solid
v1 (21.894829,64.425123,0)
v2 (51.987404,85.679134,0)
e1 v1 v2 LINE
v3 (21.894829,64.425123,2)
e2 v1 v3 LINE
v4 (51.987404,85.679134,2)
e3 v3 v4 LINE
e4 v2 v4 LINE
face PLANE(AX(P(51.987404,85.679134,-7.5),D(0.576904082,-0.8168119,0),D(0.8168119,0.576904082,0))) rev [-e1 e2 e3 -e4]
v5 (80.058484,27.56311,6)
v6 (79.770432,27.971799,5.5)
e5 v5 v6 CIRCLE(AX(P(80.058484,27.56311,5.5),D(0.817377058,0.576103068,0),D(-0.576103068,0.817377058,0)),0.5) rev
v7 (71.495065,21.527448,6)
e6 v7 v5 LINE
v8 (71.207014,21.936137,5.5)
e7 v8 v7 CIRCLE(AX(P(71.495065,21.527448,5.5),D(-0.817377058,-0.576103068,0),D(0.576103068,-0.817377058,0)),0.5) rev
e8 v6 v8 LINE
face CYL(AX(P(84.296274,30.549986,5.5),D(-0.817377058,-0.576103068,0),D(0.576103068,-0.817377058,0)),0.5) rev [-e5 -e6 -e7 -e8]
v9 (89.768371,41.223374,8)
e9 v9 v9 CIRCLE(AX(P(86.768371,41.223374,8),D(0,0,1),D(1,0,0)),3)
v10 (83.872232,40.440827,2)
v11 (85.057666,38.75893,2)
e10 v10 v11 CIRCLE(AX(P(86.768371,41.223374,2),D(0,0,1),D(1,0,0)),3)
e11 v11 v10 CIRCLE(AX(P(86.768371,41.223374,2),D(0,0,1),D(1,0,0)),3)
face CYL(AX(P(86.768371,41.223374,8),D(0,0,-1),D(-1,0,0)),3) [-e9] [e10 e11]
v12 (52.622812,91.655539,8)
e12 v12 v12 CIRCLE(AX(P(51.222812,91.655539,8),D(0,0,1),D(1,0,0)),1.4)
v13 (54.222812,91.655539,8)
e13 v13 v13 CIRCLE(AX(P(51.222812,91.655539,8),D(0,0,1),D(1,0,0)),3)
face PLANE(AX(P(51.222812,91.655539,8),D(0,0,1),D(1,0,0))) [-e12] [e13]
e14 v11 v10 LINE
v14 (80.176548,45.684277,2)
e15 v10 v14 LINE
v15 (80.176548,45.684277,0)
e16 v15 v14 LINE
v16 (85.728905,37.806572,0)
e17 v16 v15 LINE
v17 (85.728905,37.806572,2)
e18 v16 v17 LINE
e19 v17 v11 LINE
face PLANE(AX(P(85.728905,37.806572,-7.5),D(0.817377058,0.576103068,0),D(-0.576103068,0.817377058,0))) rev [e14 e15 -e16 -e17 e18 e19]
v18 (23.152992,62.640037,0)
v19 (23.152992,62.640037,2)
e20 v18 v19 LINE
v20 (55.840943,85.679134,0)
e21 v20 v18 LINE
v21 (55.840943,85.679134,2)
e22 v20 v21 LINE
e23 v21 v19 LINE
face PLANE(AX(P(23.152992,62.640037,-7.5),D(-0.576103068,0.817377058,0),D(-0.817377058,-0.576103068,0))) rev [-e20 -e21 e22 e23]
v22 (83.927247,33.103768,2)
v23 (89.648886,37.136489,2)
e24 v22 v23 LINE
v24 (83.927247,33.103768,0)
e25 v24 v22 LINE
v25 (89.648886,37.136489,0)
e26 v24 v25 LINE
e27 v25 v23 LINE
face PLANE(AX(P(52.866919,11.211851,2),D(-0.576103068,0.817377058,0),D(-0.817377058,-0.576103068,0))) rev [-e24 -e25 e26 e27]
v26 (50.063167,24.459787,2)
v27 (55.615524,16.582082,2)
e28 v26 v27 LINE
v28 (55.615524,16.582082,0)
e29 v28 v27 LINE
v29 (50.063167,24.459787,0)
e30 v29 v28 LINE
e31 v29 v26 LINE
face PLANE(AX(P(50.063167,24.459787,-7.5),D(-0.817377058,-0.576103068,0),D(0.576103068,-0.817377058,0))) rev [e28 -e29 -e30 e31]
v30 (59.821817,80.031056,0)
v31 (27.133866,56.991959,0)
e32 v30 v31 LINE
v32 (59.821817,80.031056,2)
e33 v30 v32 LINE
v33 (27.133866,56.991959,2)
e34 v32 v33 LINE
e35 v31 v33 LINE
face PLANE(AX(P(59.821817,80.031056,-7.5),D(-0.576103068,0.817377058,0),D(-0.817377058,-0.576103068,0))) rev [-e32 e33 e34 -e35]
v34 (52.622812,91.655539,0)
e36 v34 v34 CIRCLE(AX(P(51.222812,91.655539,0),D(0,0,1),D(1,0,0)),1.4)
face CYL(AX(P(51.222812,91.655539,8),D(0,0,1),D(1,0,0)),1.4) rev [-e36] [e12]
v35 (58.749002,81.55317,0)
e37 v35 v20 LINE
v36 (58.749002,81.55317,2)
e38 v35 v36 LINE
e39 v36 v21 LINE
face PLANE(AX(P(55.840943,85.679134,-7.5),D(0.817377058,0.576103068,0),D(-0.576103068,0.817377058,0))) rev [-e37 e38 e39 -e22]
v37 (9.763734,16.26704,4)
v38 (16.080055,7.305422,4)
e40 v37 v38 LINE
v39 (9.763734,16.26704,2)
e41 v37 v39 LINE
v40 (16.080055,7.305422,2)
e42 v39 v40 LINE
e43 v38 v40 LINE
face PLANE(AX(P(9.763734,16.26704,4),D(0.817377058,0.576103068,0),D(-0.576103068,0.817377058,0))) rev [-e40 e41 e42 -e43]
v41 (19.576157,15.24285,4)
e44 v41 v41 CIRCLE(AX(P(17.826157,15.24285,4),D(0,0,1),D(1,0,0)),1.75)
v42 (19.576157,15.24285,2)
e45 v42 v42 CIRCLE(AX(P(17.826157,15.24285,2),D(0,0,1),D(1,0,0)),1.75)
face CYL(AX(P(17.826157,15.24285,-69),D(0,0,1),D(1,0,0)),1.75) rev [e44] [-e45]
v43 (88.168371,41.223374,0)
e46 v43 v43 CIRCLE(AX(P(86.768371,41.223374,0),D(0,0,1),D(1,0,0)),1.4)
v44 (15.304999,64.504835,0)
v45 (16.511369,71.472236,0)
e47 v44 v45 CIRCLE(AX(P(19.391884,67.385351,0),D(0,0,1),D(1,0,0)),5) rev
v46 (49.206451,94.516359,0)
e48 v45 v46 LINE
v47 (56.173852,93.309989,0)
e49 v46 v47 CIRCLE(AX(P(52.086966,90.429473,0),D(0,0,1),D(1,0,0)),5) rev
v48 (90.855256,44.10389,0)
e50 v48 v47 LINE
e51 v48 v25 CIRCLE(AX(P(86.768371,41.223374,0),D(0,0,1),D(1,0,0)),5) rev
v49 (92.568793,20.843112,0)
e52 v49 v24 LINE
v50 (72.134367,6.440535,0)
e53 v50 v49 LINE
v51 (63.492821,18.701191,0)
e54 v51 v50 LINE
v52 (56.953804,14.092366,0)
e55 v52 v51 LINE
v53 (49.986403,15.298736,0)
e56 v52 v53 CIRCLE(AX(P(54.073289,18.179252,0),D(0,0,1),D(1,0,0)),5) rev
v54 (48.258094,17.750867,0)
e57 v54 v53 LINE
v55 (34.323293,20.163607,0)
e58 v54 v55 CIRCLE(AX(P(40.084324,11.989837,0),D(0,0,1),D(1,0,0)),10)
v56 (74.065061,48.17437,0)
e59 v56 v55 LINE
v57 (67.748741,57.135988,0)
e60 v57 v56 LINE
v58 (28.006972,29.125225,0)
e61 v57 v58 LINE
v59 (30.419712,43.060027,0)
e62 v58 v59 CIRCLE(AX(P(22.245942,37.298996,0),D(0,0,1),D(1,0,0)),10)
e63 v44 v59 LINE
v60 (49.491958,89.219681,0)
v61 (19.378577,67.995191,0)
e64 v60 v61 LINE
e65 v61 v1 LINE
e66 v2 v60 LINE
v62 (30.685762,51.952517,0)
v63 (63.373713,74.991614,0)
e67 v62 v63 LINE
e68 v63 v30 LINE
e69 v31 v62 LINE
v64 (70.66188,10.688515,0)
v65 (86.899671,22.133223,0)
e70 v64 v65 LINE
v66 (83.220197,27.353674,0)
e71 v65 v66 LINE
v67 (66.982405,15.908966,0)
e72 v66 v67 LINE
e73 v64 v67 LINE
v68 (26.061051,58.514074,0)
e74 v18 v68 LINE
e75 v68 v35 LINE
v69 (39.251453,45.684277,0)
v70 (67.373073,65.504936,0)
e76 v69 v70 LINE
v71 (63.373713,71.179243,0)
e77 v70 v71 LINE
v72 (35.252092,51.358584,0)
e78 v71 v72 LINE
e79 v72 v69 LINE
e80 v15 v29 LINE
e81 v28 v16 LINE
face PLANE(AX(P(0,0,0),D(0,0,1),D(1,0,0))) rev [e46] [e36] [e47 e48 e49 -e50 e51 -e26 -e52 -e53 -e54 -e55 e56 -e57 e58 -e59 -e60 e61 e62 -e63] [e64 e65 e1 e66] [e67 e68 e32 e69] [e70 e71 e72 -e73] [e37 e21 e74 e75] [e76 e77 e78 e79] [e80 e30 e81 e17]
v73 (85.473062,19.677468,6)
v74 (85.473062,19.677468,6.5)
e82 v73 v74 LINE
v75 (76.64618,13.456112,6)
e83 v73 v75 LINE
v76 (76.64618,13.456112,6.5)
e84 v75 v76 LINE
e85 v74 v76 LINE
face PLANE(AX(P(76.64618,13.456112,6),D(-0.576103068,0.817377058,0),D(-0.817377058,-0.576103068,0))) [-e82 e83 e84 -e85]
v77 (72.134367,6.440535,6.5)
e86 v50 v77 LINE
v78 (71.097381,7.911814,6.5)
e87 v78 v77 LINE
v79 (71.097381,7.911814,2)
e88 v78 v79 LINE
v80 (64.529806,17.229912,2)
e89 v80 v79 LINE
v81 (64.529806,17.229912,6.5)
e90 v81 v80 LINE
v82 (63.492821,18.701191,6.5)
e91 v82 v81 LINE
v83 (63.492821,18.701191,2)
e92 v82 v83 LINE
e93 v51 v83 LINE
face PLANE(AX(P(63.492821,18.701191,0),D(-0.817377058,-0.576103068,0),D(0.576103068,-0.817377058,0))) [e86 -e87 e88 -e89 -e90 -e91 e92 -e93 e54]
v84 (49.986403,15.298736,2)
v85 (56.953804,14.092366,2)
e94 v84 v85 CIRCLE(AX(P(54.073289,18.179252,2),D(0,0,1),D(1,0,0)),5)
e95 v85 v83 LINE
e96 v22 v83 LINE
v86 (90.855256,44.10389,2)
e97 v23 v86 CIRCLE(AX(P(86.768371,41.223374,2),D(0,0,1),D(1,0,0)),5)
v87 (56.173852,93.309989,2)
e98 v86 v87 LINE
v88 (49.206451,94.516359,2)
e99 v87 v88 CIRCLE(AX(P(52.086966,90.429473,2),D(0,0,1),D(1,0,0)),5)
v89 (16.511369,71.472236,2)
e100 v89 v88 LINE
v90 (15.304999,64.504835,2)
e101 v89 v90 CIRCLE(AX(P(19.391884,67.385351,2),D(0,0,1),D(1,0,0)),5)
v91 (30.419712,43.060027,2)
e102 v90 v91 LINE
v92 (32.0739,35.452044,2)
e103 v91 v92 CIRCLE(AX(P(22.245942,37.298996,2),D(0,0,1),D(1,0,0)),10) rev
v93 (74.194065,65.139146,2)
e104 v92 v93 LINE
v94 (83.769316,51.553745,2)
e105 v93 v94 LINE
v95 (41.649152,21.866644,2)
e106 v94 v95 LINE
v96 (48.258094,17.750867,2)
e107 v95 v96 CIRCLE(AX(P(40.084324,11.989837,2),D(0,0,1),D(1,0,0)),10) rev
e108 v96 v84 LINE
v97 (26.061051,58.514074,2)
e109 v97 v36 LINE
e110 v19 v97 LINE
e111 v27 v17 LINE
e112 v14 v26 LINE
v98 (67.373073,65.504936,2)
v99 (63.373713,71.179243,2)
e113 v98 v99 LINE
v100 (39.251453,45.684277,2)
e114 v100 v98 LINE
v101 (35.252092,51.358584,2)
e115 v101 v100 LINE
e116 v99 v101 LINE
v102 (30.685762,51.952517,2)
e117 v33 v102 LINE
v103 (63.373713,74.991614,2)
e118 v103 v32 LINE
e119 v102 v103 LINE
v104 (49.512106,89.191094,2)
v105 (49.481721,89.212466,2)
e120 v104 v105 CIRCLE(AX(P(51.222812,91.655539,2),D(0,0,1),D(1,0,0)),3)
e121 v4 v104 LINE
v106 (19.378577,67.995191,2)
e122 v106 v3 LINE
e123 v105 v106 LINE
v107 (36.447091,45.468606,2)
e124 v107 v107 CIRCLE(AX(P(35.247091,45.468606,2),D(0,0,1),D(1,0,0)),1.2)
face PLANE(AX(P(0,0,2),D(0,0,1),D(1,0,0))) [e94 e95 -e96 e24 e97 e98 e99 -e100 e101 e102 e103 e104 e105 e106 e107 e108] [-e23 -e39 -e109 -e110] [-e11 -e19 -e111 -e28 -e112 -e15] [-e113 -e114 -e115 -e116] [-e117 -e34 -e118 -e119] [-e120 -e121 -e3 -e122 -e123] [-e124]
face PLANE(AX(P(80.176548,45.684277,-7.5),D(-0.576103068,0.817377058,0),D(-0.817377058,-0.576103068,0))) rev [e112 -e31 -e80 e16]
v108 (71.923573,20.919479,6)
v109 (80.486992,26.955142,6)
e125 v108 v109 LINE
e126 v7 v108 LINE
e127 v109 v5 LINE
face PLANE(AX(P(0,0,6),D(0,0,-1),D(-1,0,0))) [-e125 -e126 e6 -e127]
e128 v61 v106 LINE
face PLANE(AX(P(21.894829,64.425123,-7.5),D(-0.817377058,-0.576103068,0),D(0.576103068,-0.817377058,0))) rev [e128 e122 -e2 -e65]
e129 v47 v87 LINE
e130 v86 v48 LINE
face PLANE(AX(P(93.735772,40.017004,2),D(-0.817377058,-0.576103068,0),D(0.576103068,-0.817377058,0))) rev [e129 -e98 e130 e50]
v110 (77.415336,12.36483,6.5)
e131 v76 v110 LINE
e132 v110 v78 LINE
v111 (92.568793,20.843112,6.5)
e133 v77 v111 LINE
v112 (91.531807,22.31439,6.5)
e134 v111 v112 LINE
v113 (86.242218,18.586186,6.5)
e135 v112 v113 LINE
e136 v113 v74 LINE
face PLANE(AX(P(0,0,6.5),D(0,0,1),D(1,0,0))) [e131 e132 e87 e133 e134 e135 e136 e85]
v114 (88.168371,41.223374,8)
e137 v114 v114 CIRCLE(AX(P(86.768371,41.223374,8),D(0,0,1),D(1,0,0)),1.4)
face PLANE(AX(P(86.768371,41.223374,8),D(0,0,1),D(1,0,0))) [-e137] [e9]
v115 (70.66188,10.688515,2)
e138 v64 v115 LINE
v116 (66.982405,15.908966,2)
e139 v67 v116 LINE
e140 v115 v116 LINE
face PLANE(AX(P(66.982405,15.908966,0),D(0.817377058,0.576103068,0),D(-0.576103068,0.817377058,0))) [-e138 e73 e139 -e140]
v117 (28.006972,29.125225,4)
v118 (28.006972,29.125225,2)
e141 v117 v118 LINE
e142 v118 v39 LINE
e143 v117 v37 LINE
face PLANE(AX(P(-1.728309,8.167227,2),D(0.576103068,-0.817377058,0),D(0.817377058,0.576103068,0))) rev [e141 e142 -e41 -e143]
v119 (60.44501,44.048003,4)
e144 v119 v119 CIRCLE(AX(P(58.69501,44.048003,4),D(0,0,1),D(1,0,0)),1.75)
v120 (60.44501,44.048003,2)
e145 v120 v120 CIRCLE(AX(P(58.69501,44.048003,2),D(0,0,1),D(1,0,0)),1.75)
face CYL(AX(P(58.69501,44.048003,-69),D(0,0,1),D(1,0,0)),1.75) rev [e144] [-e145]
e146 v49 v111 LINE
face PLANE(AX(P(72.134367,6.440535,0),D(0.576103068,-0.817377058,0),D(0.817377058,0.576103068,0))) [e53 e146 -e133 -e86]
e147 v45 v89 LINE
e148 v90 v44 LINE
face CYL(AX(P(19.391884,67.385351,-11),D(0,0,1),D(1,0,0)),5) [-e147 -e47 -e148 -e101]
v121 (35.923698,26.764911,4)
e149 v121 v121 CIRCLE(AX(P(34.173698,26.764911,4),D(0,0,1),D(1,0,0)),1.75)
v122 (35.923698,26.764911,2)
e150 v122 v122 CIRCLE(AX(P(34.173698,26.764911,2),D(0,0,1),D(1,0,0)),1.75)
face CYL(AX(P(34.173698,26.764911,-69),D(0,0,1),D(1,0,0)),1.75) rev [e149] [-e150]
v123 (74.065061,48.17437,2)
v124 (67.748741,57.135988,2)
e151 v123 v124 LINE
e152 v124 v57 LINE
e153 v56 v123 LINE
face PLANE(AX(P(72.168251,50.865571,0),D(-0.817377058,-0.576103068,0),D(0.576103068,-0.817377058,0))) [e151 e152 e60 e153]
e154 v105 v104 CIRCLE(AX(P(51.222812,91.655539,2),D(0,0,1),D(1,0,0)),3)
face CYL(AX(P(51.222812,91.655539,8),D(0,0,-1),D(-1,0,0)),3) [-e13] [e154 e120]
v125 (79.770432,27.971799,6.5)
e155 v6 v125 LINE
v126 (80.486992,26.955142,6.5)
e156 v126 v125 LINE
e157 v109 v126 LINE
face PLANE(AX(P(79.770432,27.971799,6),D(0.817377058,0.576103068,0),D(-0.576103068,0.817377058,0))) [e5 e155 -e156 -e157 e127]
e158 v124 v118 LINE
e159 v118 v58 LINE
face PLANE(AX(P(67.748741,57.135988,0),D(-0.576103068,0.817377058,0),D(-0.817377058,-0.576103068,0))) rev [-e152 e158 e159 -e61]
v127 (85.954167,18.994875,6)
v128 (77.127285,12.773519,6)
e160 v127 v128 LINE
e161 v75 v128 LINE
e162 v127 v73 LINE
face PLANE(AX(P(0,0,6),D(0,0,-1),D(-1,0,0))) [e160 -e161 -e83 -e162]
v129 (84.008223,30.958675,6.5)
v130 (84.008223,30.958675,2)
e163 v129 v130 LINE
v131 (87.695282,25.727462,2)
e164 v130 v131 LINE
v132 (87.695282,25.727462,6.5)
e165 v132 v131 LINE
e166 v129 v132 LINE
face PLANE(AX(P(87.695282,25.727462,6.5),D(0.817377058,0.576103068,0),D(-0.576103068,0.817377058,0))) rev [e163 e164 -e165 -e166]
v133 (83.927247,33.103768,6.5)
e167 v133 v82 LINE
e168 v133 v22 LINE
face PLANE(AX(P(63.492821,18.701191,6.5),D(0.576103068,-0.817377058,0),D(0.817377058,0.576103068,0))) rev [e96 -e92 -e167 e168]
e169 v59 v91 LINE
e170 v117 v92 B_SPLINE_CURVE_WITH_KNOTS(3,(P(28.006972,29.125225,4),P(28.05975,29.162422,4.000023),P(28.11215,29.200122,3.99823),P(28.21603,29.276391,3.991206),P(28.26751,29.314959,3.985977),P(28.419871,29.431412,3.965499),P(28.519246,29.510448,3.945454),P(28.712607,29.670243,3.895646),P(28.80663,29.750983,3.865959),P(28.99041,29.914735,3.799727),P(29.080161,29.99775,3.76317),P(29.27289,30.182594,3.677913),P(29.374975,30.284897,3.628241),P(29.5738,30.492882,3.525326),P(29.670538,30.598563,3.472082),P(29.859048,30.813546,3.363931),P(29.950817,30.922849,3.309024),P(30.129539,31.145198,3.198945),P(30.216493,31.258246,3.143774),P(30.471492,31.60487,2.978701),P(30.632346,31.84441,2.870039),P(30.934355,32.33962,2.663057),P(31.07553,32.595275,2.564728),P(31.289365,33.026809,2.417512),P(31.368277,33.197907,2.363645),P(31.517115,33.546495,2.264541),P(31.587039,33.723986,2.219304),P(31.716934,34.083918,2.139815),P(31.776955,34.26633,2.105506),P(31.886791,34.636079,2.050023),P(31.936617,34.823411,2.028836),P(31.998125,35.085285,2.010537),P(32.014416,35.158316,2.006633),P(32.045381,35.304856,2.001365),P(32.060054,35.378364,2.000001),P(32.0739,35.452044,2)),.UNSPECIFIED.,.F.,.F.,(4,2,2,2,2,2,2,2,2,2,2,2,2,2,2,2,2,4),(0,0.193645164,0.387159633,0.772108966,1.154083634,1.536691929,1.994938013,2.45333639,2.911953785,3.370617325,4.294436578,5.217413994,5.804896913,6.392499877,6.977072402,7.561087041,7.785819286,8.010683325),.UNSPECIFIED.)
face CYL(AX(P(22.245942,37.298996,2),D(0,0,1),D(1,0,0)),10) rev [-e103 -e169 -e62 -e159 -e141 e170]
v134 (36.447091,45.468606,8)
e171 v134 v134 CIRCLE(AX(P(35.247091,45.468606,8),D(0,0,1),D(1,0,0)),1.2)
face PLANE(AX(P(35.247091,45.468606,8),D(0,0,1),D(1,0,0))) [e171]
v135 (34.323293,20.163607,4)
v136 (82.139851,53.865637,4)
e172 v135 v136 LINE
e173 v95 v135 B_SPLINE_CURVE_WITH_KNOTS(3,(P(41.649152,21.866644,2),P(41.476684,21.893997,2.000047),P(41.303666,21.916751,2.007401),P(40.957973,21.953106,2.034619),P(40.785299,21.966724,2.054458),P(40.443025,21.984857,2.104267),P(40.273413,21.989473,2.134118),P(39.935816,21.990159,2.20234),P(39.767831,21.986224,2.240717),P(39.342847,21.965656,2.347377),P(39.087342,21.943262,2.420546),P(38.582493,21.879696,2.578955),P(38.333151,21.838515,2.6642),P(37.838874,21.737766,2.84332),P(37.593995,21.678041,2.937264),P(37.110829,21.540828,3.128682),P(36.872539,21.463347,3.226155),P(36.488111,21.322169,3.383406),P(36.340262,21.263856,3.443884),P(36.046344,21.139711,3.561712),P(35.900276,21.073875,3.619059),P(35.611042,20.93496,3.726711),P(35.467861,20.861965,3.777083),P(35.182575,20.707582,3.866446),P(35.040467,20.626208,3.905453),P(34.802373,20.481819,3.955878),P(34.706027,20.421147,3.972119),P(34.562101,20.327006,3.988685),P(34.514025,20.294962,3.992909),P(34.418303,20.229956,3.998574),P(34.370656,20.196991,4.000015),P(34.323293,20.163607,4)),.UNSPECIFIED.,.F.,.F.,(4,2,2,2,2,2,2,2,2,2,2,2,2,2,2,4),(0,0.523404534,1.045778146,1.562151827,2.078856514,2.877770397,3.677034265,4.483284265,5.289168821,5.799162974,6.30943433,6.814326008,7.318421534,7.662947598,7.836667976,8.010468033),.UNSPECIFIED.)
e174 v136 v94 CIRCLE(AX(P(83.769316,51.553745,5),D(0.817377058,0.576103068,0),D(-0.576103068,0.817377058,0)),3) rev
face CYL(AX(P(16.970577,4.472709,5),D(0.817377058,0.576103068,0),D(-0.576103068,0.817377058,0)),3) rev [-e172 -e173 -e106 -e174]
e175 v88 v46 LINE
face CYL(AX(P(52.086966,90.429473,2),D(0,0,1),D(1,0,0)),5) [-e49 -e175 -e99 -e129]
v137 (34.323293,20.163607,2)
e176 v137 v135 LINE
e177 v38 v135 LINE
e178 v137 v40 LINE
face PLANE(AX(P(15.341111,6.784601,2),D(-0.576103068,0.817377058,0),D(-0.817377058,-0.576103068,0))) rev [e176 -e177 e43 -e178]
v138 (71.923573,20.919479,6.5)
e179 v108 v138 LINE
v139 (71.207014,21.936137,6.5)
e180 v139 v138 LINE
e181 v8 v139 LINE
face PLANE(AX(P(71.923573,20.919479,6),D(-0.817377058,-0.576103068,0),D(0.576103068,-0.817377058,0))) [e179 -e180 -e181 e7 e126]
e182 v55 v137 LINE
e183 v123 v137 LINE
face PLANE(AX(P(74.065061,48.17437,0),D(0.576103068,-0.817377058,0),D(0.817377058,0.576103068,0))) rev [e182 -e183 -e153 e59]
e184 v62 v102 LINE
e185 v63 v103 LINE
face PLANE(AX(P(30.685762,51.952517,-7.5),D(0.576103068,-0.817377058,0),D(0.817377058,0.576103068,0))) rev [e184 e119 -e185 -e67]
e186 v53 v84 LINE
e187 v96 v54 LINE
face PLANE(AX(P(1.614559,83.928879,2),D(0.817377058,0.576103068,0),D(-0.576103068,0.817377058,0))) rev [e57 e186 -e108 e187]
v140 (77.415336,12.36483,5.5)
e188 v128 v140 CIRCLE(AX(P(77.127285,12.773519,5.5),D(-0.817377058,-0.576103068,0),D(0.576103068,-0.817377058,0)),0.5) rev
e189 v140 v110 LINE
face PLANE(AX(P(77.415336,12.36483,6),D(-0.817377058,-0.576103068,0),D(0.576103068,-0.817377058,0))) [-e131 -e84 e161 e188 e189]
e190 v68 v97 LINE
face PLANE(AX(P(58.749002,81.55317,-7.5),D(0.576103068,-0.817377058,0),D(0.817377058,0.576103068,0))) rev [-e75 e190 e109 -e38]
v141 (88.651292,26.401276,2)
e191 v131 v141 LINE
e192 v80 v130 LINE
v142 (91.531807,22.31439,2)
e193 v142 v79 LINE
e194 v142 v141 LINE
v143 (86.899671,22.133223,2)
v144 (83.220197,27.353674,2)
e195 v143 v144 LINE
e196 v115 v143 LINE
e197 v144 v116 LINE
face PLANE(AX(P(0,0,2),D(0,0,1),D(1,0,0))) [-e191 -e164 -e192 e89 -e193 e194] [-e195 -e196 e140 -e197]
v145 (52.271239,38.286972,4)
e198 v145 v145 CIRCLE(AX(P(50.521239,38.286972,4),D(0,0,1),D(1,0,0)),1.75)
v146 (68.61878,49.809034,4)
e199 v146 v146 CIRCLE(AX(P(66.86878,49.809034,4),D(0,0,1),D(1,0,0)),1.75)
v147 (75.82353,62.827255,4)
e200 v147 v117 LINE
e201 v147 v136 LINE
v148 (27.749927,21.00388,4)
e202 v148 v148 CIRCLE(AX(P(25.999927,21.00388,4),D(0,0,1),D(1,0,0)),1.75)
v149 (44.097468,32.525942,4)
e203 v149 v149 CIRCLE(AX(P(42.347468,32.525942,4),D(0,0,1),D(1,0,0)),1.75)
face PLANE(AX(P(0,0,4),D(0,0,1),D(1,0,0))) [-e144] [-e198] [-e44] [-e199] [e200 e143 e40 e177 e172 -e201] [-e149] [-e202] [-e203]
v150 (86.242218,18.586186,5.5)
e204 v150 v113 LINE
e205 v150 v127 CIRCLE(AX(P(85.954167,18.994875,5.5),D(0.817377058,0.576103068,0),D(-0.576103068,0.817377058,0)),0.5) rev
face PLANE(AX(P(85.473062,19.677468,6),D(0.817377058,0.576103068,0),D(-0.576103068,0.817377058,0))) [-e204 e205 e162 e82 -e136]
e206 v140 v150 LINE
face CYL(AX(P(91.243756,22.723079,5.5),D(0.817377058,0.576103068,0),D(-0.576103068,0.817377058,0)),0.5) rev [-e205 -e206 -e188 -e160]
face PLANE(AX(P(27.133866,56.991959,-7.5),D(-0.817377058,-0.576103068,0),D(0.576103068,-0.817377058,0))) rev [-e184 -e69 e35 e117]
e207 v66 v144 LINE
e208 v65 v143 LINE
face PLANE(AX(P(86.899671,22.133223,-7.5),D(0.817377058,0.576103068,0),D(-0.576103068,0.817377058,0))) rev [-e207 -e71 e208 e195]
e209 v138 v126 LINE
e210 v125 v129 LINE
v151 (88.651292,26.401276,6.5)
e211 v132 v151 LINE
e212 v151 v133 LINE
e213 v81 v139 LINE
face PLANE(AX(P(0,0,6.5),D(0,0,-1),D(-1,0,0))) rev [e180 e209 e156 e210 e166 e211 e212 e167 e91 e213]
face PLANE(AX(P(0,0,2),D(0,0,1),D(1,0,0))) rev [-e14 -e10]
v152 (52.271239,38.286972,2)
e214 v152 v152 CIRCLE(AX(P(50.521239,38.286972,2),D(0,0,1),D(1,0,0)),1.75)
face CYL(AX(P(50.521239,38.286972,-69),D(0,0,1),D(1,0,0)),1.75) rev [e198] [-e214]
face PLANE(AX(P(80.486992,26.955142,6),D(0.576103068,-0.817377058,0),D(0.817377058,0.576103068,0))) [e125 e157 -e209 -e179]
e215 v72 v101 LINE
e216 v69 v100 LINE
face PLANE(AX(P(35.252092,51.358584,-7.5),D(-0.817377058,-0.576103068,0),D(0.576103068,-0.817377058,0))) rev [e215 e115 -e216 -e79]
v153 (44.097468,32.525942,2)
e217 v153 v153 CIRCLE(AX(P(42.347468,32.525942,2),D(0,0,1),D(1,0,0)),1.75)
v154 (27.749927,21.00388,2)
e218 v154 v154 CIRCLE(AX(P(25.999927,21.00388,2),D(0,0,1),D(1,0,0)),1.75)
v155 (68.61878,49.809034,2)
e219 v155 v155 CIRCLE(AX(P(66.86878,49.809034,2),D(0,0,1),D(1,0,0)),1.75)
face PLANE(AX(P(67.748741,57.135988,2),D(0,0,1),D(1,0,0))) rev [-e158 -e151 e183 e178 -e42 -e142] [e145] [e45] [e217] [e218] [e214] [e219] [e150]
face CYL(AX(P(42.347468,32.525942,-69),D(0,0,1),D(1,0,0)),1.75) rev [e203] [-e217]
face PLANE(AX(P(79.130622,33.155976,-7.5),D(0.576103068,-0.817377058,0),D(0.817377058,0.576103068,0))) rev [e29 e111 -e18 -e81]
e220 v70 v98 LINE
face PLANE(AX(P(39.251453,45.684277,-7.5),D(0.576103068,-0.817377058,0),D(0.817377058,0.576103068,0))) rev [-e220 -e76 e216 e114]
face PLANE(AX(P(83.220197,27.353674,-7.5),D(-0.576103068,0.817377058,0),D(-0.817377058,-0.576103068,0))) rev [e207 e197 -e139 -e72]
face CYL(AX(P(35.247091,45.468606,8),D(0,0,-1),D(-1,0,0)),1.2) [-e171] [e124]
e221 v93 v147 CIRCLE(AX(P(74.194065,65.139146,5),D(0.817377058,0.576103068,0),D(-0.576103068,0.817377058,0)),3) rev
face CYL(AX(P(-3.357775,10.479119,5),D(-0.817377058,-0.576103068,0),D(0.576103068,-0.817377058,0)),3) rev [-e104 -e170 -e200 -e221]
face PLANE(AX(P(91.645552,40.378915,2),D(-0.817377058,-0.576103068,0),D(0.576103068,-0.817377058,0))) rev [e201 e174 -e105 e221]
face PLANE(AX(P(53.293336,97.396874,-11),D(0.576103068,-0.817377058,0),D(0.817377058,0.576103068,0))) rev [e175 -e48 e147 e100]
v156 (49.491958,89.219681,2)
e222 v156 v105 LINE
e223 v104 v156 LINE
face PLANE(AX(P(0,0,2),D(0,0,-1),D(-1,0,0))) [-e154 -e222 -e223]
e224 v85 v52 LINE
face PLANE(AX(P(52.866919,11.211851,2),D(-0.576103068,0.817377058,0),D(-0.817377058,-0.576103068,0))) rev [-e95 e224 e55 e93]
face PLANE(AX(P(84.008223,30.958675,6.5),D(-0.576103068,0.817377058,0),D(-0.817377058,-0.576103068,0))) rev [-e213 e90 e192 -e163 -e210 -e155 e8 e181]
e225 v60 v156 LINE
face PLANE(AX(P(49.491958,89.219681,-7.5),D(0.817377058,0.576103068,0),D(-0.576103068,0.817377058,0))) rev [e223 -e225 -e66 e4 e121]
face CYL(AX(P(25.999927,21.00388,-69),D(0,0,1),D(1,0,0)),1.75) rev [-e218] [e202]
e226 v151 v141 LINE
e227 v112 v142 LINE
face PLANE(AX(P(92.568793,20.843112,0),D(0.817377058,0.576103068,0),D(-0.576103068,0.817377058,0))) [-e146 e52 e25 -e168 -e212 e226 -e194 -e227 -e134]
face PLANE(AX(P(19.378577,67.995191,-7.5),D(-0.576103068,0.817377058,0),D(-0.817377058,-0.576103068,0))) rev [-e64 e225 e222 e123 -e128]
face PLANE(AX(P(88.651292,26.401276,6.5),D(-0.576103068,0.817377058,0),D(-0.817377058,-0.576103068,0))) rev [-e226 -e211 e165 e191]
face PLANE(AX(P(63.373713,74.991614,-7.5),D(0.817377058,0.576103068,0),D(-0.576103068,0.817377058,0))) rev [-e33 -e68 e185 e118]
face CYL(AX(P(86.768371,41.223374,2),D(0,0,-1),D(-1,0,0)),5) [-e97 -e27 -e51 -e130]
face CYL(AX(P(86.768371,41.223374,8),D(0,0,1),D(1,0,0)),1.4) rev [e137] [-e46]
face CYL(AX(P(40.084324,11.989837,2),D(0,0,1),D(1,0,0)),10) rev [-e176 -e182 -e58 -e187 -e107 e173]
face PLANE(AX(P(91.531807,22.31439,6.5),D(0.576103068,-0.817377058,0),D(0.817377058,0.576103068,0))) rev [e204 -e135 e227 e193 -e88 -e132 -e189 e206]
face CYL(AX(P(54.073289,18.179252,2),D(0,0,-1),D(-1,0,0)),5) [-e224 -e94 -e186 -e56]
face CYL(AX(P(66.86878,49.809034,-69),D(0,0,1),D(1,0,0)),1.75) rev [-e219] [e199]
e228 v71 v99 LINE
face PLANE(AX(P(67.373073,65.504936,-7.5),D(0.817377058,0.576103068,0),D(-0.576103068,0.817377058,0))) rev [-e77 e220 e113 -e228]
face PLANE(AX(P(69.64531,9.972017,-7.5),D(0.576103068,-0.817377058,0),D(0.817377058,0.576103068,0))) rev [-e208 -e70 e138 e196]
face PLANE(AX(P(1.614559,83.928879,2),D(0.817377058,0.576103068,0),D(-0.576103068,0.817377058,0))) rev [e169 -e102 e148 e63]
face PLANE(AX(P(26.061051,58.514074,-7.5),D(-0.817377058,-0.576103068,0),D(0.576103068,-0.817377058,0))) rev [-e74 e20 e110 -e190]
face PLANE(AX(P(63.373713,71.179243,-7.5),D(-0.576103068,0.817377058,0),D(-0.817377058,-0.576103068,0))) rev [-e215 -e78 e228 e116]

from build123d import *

# Parameters (mm, degrees)
SKETCH_1_R                = 2.1
EXTRUDE_1_DEPTH           = 2
EXTRUDE_2_DEPTH           = 40
EXTRUDE_3_DEPTH           = 2
FILLET_1_R                = 10
EXTRUDE_START             = -4
SKETCH_10_R               = 2.075
EXTRUDE_4_DEPTH           = 4
SKETCH_14_R               = 3.5715559825460215
CUT_EXTRUDE_6_DEPTH       = 4
EXTRUDE_5_DEPTH           = 2
FILLET_START              = 47.050234375
FILLET_4_DEPTH            = 51.949765625
FILLET_START_2            = 39.671388204
FILLET_4_2_DEPTH          = 59.328611796
FILLET_START_3            = 2
FILLET_4_3_DEPTH          = 3
EXTRUDE_START_2           = 2
SKETCH_19_R               = 2.075
EXTRUDE_6_DEPTH           = 2
CUT_EXTRUDE_START         = -2
SKETCH_22_R               = 3.5715559825460206
CUT_EXTRUDE_11_DEPTH      = 2
SKETCH_23_R               = 3.75
CUT_EXTRUDE_12_DEPTH      = 2
CUT_EXTRUDE_13_DEPTH      = 28.999999999999996
CUT_EXTRUDE_14_DEPTH      = 12.999999999999984
SKETCH_29_R               = 3.0000000000000084
SKETCH_29_R_2             = 3.0000000000000018
SKETCH_29_R_3             = 1.2000000000000004
EXTRUDE_8_DEPTH           = 5.999999999999993
CUT_EXTRUDE_15_DEPTH      = 13
M3X0_5_1_D                = 2.8
FILLET_START_4            = -1
FILLET_8_DEPTH            = 4
EXTRUDE_9_DEPTH           = 1.9999999999999991
EXTRUDE_10_DEPTH          = 4.5
EXTRUDE_11_DEPTH          = 0.5
FILLET_9_R                = 0.5
CUT_EXTRUDE_16_DEPTH      = 9.500000000000002
EXTRUDE_12_DEPTH          = 2
CUT_EXTRUDE_19_DEPTH      = 10
CUT_EXTRUDE_19_DEPTH_BACK = 11.999999999999996
SKETCH_44_W               = 6
SKETCH_44_H               = 13.386484239674381
SKETCH_47_W               = 2
SKETCH_47_H               = 10.963872604458905
CUT_EXTRUDE_20_DEPTH      = 73.00000000000006
SKETCH_48_R               = 1.7500000000000004
SKETCH_48_R_2             = 1.7500000000000038
SKETCH_48_R_3             = 1.7499999999999882
SKETCH_48_R_4             = 1.749999999999997
CUT_EXTRUDE_21_DEPTH      = 73.00000000000006


with BuildPart() as part:
    # 草图1 → 凸台-拉伸1 (new body)
    with BuildSketch(Plane.XY):
        with BuildLine():
            Line((5.715095935783956, 0), (15.341111112939824, 6.784600591097247))
            Line((15.341111112939824, 6.784600591097247), (42.49706355926069, 25.92463804463833))
            Line((42.49706355926069, 25.92463804463833), (52.86691877711603, 11.211850995247643))
            Line((52.86691877711603, 11.211850995247643), (93.73577169209018, 40.017004378179195))
            Line((93.73577169209018, 40.017004378179195), (42.483411773869754, 112.7340328625418))
            Line((42.483411773869754, 112.7340328625418), (1.6145588588956372, 83.92887947961026))
            Line((1.6145588588956372, 83.92887947961026), (36.18074291841349, 34.88625598164134))
            Line((36.18074291841349, 34.88625598164134), (-1.7283092029758853, 8.167227110682408))
            Line((-1.7283092029758853, 8.167227110682408), (0, 5.715095935783956))
            ThreePointArc((0, 5.715095935783956), (-4.0411830913245135, -4.041183091324513), (5.715095935783956, 0))
        make_face()
        Circle(SKETCH_1_R, mode=Mode.SUBTRACT)
        with BuildLine():
            Line((7.071067811864017, 9.899494936610912), (6.585786437625429, 9.414213562372302))
            ThreePointArc((6.585786437625429, 9.414213562372302), (6.585786437625458, 6.585786437626118), (9.41421356237164, 6.58578643762615))
            Line((9.41421356237164, 6.58578643762615), (9.899494936610207, 7.071067811864724))
            ThreePointArc((9.899494936610207, 7.071067811864724), (9.899494936610207, 9.899494936610912), (7.071067811864017, 9.899494936610912))
        make_face(mode=Mode.SUBTRACT)
    extrude(amount=EXTRUDE_1_DEPTH)

    # 草图2 → 凸台-拉伸2 (add)
    with BuildSketch(Plane.XY.offset(2)):
        Polygon((2.4787134603835828, 82.70281389216105), (42.12150078790845, 110.64381267360466), (91.64555150315304, 40.37891536414052), (52.00276417562808, 12.43791658269687), (52.86691877711603, 11.211850995247648), (93.73577169209018, 40.017004378179195), (42.483411773869754, 112.7340328625418), (1.6145588588956372, 83.92887947961026), align=None)
    extrude(amount=EXTRUDE_2_DEPTH)

    # 草图4 → 凸台-拉伸3 (add)
    with BuildSketch(Plane.XY.offset(42)):
        Polygon((93.73577169209018, 40.017004378179195), (52.86691877711603, 11.211850995247648), (1.6145588588956372, 83.92887947961026), (42.483411773869754, 112.7340328625418), align=None)
    extrude(amount=EXTRUDE_3_DEPTH)

    # 圆角1
    fillet_1_edges = [part.edges().sort_by_distance(p)[0] for p in [
        (36.18074291841349, 34.88625598164134, 1),
        (42.49706355926069, 25.92463804463833, 1),
    ]]
    fillet(fillet_1_edges, radius=FILLET_1_R)

    # 草图10 → 凸台-拉伸4 (add)
    with BuildSketch(Plane.XY.offset(2).offset(EXTRUDE_START)):
        with BuildLine():
            Line((8.031882820422537, 15.046398123036559), (14.348203461269724, 6.084780186033628))
            Line((14.348203461269724, 6.084780186033628), (5.715095935783956, 0))
            ThreePointArc((5.715095935783956, 0), (-4.0411830913245135, -4.041183091324513), (0, 5.715095935783956))
            Line((0, 5.715095935783956), (-1.7283092029758853, 8.167227110682408))
            Line((-1.7283092029758853, 8.167227110682408), (8.031882820422537, 15.046398123036559))
        make_face()
        Circle(SKETCH_10_R, mode=Mode.SUBTRACT)
        with BuildLine():
            Line((7.071067811864017, 9.899494936610912), (6.58578643762543, 9.4142135623723))
            ThreePointArc((6.58578643762543, 9.4142135623723), (6.585786437625461, 6.585786437626118), (9.414213562371643, 6.58578643762615))
            Line((9.414213562371643, 6.58578643762615), (9.899494936610205, 7.071067811864723))
            ThreePointArc((9.899494936610205, 7.071067811864723), (9.899494936610207, 9.899494936610912), (7.071067811864017, 9.899494936610912))
        make_face(mode=Mode.SUBTRACT)
    extrude(amount=EXTRUDE_4_DEPTH)

    # 草图14 → 切除-拉伸6 (cut)
    with BuildSketch(Plane(origin=(0, 0, 0), x_dir=(-1, 0, 0), z_dir=(0, 0, -1))):
        with Locations((-7.999999999998536, 7.999999999999225)):
            Circle(SKETCH_14_R)
    extrude(amount=-CUT_EXTRUDE_6_DEPTH, mode=Mode.SUBTRACT)

    # 草图17 → 凸台-拉伸5 (add)
    with BuildSketch(Plane.XY.offset(2)):
        Polygon((9.763733946874806, 16.267040097932394), (16.080054587722028, 7.305422160929461), (83.36591647423481, 54.72979142756991), (77.0495958333876, 63.691409364572834), align=None)
    extrude(amount=EXTRUDE_5_DEPTH)

    # 圆角4: read off the stored shape, not the designer's step
    # 圆角4 outline → 圆角4 (add)
    with BuildSketch(Plane(origin=(0, 0, 0), x_dir=(0.5761030676586296, -0.817377058299483, 0), z_dir=(0.8173770582994829, 0.57610306765863, 0)).offset(FILLET_START)):
        with BuildLine():
            ThreePointArc((3.29248099, -4.000009364), (4.388856563, -2.550513124), (6.120911425, -2))
            Line((6.120911425, -2), (3.292484301, -2))
            Line((3.292484301, -2), (3.29248099, -4.000009364))
        make_face()
    extrude(amount=FILLET_4_DEPTH)

    # Fillet 4 2 outline → Fillet 4 2 (add)
    with BuildSketch(Plane(origin=(0, 0, 0), x_dir=(0.5761030676586296, -0.817377058299483, 0), z_dir=(0.8173770582994829, 0.57610306765863, 0)).offset(FILLET_START_2)):
        with BuildLine():
            Line((-7.671384802, -4.000009905), (-7.671388304, -2))
            Line((-7.671388304, -2), (-10.499815429, -2))
            ThreePointArc((-10.499815429, -2), (-8.767760332, -2.55051329), (-7.671384802, -4.000009905))
        make_face()
        with BuildLine():
            ThreePointArc((3.29248099, -4.000009364), (4.388856563, -2.550513124), (6.120911425, -2))
            Line((6.120911425, -2), (3.292484301, -2))
            Line((3.292484301, -2), (3.29248099, -4.000009364))
        make_face()
    extrude(amount=FILLET_4_2_DEPTH)

    # Fillet 4 3 outline → Fillet 4 3 (cut)
    with BuildSketch(Plane.XY.offset(FILLET_START_3)):
        with BuildLine():
            Line((26.37750671, 31.437116691), (28.006972335, 29.125225305))
            ThreePointArc((28.006972335, 29.125225305), (32.099334124, 35.592931139), (30.419712242, 43.060026565))
            Line((30.419712242, 43.060026565), (25, 50.749533353))
            Line((25, 50.749533353), (25, 33.391528054))
            Line((25, 33.391528054), (26.37750671, 31.437116691))
        make_face()
        with BuildLine():
            Line((35.952758438, 17.851715868), (37.257883388, 16))
            Line((37.257883388, 16), (49.49213929, 16))
            Line((49.49213929, 16), (48.258094236, 17.750867462))
            ThreePointArc((48.258094236, 17.750867462), (41.790388402, 21.84322925), (34.323292976, 20.163607368))
            Line((34.323292976, 20.163607368), (35.952758438, 17.851715868))
        make_face()
    extrude(amount=FILLET_4_3_DEPTH, mode=Mode.SUBTRACT)

    # 草图19 → 凸台-拉伸6 (add)
    with BuildSketch(Plane(origin=(0, 0, -2), x_dir=(-1, 0, 0), z_dir=(0, 0, -1)).offset(EXTRUDE_START_2)):
        with BuildLine():
            Line((1.7283092029758853, 8.167227110682408), (-8.031882820422537, 15.046398123036559))
            Line((-8.031882820422537, 15.046398123036559), (-14.348203461269724, 6.084780186033628))
            Line((-14.348203461269724, 6.084780186033628), (-5.715095935783956, 0))
            ThreePointArc((-5.715095935783956, 0), (4.041183091324512, -4.0411830913245135), (3.5e-16, 5.715095935783956))
            Line((3.5e-16, 5.715095935783956), (1.7283092029758853, 8.167227110682408))
        make_face()
        with Locations(Location((0, 0, 0), (0, 0, 180))):
            Circle(SKETCH_19_R, mode=Mode.SUBTRACT)
        with BuildLine():
            Line((-9.414213562371643, 6.58578643762615), (-9.899494936610205, 7.071067811864723))
            ThreePointArc((-9.899494936610205, 7.071067811864723), (-9.899494936610207, 9.899494936610914), (-7.071067811864017, 9.899494936610912))
            Line((-7.071067811864017, 9.899494936610912), (-6.58578643762543, 9.4142135623723))
            ThreePointArc((-6.58578643762543, 9.4142135623723), (-6.585786437625462, 6.585786437626118), (-9.414213562371643, 6.58578643762615))
        make_face(mode=Mode.SUBTRACT)
    extrude(amount=-EXTRUDE_6_DEPTH)

    # 草图22 → 切除-拉伸11 (cut)
    with BuildSketch(Plane.XY.offset(CUT_EXTRUDE_START)):
        with Locations((7.999999999998536, 7.999999999999225)):
            Circle(SKETCH_22_R)
    extrude(amount=CUT_EXTRUDE_11_DEPTH, mode=Mode.SUBTRACT)

    # 草图23 → 切除-拉伸12 (cut)
    with BuildSketch(Plane.XY.offset(2)):
        Circle(SKETCH_23_R)
    extrude(amount=-CUT_EXTRUDE_12_DEPTH, mode=Mode.SUBTRACT)

    # 草图24 → 切除-拉伸13 (cut)
    with BuildSketch(Plane.XY.offset(44.00000000000001)):
        Polygon((1.6145588588956372, 83.92887947961026), (42.483411773869754, 112.7340328625418), (93.73577169209018, 40.017004378179195), (52.86691877711603, 11.211850995247648), (2.4787134603835828, 82.70281389216105), align=None)
    extrude(amount=-CUT_EXTRUDE_13_DEPTH, mode=Mode.SUBTRACT)

    # 草图25 → 切除-拉伸14 (cut)
    with BuildSketch(Plane.XY.offset(15.000000000000007)):
        Polygon((2.4787134603835828, 82.70281389216105), (1.6145588588956372, 83.92887947961026), (42.48341177386975, 112.7340328625418), (93.73577169209018, 40.017004378179195), (52.86691877711603, 11.211850995247648), (52.00276417562802, 12.437916582696838), (91.64555150315304, 40.37891536414052), (42.12150078790842, 110.64381267360463), align=None)
    extrude(amount=-CUT_EXTRUDE_14_DEPTH, mode=Mode.SUBTRACT)

    # 草图29 → 凸台-拉伸8 (add)
    with BuildSketch(Plane.XY.offset(2)):
        with Locations((86.76837106229962, 41.223374331383454)):
            Circle(SKETCH_29_R)
        with Locations((51.2228117877621, 91.65553882846152)):
            Circle(SKETCH_29_R_2)
        with Locations((35.247091362615166, 45.46860572527032)):
            Circle(SKETCH_29_R_3)
    extrude(amount=EXTRUDE_8_DEPTH)

    # 草图30 → 切除-拉伸15 (cut)
    with BuildSketch(Plane.XY.offset(2)):
        Polygon((1.6145588588956372, 83.92887947961026), (42.48341177386975, 112.7340328625418), (53.29333634245431, 97.39687387080285), (12.424483427480185, 68.59172048787134), align=None)
    extrude(amount=-CUT_EXTRUDE_15_DEPTH, mode=Mode.SUBTRACT)

    # M3x0.5 螺纹孔1 (through all)
    with Locations(Plane.XY.offset(7.999999999999993)):
        with Locations((51.222811788, 91.655538828), (86.768371062, 41.223374331)):
            Hole(M3X0_5_1_D / 2)

    # 圆角8: read off the stored shape, not the designer's step
    # 圆角8 outline → 圆角8 (cut)
    with BuildSketch(Plane.XY.offset(FILLET_START_4)):
        with BuildLine():
            Line((52.866918777, 11.211850995), (56.953804069, 14.092366334))
            ThreePointArc((56.953804069, 14.092366334), (53.220256356, 13.252555392), (49.986403439, 15.298736287))
            Line((49.986403439, 15.298736287), (52.866918777, 11.211850995))
        make_face()
        with BuildLine():
            ThreePointArc((15.304998766, 64.504835196), (14.465187825, 68.238382909), (16.511368719, 71.472235826))
            Line((16.511368719, 71.472235826), (12.424483427, 68.591720488))
            Line((12.424483427, 68.591720488), (15.304998766, 64.504835196))
        make_face()
        with BuildLine():
            ThreePointArc((49.206451051, 94.516358533), (52.939998764, 95.356169474), (56.173851681, 93.309988579))
            Line((56.173851681, 93.309988579), (53.293336342, 97.396873871))
            Line((53.293336342, 97.396873871), (49.206451051, 94.516358533))
        make_face()
        with BuildLine():
            ThreePointArc((90.855256354, 44.10388967), (91.695067295, 40.370341957), (89.648886401, 37.13648904))
            Line((89.648886401, 37.13648904), (93.735771692, 40.017004378))
            Line((93.735771692, 40.017004378), (90.855256354, 44.10388967))
        make_face()
    extrude(amount=FILLET_8_DEPTH, mode=Mode.SUBTRACT)

    # 草图35 → 凸台-拉伸9 (add)
    with BuildSketch(Plane.XY.offset(2)):
        Polygon((83.9272469924964, 33.10376756627563), (63.492820535009336, 18.701190874809864), (72.1343665498888, 6.440535000317625), (92.56879300737585, 20.843111691783392), align=None)
    extrude(amount=-EXTRUDE_9_DEPTH)

    # 草图36 → 凸台-拉伸10 (add)
    with BuildSketch(Plane.XY.offset(2)):
        Polygon((83.9272469924964, 33.10376756627563), (88.65129214729717, 26.401275688219865), (87.69528224340063, 25.727461525276922), (84.0082226103854, 30.95867469839361), (64.52980605679488, 17.2299121698708), (63.49282053500935, 18.70119087480987), align=None)
        Polygon((72.1343665498888, 6.440535000317625), (92.56879300737585, 20.843111691783392), (91.5318074855903, 22.31439039672246), (71.09738102810324, 7.911813705256714), align=None)
    extrude(amount=EXTRUDE_10_DEPTH)

    # 草图38 → 凸台-拉伸11 (add)
    with BuildSketch(Plane.XY.offset(6.5)):
        Polygon((71.20701372358899, 21.936136526395817), (79.77043226489411, 27.97179857636138), (80.48699168922953, 26.955141545284572), (71.92357314792442, 20.919479495319017), align=None)
        Polygon((86.2422183193346, 18.586186241257604), (77.41533643660377, 12.36483016223927), (76.64618005583336, 13.456111940066782), (85.47306193856419, 19.677468019085115), align=None)
    extrude(amount=-EXTRUDE_11_DEPTH)

    # 圆角9
    fillet_9_edges = [part.edges().sort_by_distance(p)[0] for p in [
        (75.48872299424156, 24.953967551378597, 6),
        (81.82877737796917, 15.475508201748436, 6),
    ]]
    fillet(fillet_9_edges, radius=FILLET_9_R)

    # 草图40 → 切除-拉伸16 (cut)
    with BuildSketch(Plane.XY.offset(2)):
        Polygon((65.96583570106971, 15.192468260678279), (69.64530996532923, 9.972017235426623), (86.89967078383748, 22.133222516514135), (83.22019651957794, 27.353673541765804), align=None)
        Polygon((79.13062239501116, 33.15597569096527), (85.72890544742685, 37.806572461671124), (80.1765478028438, 45.68427701304691), (50.06316674834756, 24.459787009423422), (55.61552439293061, 16.582082458047644), align=None)
        Polygon((39.25145299063004, 45.68427701304691), (67.37307339397086, 65.5049358110826), (63.37371277016225, 71.17924272816451), (35.25209236682142, 51.35858393012882), align=None)
        Polygon((30.685761748669528, 51.952517364922464), (63.37371277016222, 74.99161378651206), (59.82181706782164, 80.03105589947442), (27.133866046328958, 56.99195947788482), align=None)
        Polygon((26.06105069463626, 58.51407367149419), (23.152992111790248, 62.64003741522087), (55.84094313328293, 85.6791338368105), (58.74900171612895, 81.55317009308379), align=None)
        Polygon((21.894829409934886, 64.42512308102752), (19.378576670767988, 67.99519131593051), (49.49195772526422, 89.2196813195541), (51.98740367066816, 85.6791338368105), align=None)
    extrude(amount=-CUT_EXTRUDE_16_DEPTH, mode=Mode.SUBTRACT)

    # 草图41 → 凸台-拉伸12 (add)
    with BuildSketch(Plane.XY.offset(2)):
        Polygon((69.64530996532923, 9.972017235426623), (65.96583570106971, 15.192468260678279), (66.98240526122602, 15.908966033827006), (70.66187952548556, 10.688515008575354), align=None)
    extrude(amount=-EXTRUDE_12_DEPTH)

    # 草图44 → 切除-拉伸19 (cut, two sides: drawn at the far end of the back side and taken through both)
    with BuildSketch(Plane(origin=(2.6912011320959124, 1.896810305775386, 0), x_dir=(0, 0, 1), z_dir=(-0.8173770582994837, -0.5761030676586286, 0)).offset(-CUT_EXTRUDE_19_DEPTH_BACK)):
        with Locations((-1, 0.9781461840532351)):
            Rectangle(SKETCH_44_W, SKETCH_44_H)
    extrude(amount=CUT_EXTRUDE_19_DEPTH + CUT_EXTRUDE_19_DEPTH_BACK, mode=Mode.SUBTRACT)

    # 草图47 → 切除-拉伸20 (cut)
    with BuildSketch(Plane(origin=(12.499725831689716, 8.810047117678929, 0), x_dir=(0, 0, 1), z_dir=(-0.8173770582994837, -0.5761030676586286, 0))):
        with Locations((1, 2.1894520016609684)):
            Rectangle(SKETCH_47_W, SKETCH_47_H)
    extrude(amount=-CUT_EXTRUDE_20_DEPTH, mode=Mode.SUBTRACT)

    # 草图48 → 切除-拉伸21 (cut)
    with BuildSketch(Plane.XY.offset(4)):
        with Locations((17.826156617095315, 15.242849535382714)):
            Circle(SKETCH_48_R)
        with Locations((25.99992720009014, 21.00388021196902)):
            Circle(SKETCH_48_R)
        with Locations((34.17369778308496, 26.764910888555324)):
            Circle(SKETCH_48_R_2)
        with Locations((50.52123894907465, 38.28697224172791)):
            Circle(SKETCH_48_R_2)
        with Locations((42.34746836607982, 32.52594156514159)):
            Circle(SKETCH_48_R_2)
        with Locations((58.69500953206948, 44.04800291831422)):
            Circle(SKETCH_48_R_3)
        with Locations((66.8687801150643, 49.80903359490054)):
            Circle(SKETCH_48_R_4)
    extrude(amount=-CUT_EXTRUDE_21_DEPTH, mode=Mode.SUBTRACT)


solid = part.part
